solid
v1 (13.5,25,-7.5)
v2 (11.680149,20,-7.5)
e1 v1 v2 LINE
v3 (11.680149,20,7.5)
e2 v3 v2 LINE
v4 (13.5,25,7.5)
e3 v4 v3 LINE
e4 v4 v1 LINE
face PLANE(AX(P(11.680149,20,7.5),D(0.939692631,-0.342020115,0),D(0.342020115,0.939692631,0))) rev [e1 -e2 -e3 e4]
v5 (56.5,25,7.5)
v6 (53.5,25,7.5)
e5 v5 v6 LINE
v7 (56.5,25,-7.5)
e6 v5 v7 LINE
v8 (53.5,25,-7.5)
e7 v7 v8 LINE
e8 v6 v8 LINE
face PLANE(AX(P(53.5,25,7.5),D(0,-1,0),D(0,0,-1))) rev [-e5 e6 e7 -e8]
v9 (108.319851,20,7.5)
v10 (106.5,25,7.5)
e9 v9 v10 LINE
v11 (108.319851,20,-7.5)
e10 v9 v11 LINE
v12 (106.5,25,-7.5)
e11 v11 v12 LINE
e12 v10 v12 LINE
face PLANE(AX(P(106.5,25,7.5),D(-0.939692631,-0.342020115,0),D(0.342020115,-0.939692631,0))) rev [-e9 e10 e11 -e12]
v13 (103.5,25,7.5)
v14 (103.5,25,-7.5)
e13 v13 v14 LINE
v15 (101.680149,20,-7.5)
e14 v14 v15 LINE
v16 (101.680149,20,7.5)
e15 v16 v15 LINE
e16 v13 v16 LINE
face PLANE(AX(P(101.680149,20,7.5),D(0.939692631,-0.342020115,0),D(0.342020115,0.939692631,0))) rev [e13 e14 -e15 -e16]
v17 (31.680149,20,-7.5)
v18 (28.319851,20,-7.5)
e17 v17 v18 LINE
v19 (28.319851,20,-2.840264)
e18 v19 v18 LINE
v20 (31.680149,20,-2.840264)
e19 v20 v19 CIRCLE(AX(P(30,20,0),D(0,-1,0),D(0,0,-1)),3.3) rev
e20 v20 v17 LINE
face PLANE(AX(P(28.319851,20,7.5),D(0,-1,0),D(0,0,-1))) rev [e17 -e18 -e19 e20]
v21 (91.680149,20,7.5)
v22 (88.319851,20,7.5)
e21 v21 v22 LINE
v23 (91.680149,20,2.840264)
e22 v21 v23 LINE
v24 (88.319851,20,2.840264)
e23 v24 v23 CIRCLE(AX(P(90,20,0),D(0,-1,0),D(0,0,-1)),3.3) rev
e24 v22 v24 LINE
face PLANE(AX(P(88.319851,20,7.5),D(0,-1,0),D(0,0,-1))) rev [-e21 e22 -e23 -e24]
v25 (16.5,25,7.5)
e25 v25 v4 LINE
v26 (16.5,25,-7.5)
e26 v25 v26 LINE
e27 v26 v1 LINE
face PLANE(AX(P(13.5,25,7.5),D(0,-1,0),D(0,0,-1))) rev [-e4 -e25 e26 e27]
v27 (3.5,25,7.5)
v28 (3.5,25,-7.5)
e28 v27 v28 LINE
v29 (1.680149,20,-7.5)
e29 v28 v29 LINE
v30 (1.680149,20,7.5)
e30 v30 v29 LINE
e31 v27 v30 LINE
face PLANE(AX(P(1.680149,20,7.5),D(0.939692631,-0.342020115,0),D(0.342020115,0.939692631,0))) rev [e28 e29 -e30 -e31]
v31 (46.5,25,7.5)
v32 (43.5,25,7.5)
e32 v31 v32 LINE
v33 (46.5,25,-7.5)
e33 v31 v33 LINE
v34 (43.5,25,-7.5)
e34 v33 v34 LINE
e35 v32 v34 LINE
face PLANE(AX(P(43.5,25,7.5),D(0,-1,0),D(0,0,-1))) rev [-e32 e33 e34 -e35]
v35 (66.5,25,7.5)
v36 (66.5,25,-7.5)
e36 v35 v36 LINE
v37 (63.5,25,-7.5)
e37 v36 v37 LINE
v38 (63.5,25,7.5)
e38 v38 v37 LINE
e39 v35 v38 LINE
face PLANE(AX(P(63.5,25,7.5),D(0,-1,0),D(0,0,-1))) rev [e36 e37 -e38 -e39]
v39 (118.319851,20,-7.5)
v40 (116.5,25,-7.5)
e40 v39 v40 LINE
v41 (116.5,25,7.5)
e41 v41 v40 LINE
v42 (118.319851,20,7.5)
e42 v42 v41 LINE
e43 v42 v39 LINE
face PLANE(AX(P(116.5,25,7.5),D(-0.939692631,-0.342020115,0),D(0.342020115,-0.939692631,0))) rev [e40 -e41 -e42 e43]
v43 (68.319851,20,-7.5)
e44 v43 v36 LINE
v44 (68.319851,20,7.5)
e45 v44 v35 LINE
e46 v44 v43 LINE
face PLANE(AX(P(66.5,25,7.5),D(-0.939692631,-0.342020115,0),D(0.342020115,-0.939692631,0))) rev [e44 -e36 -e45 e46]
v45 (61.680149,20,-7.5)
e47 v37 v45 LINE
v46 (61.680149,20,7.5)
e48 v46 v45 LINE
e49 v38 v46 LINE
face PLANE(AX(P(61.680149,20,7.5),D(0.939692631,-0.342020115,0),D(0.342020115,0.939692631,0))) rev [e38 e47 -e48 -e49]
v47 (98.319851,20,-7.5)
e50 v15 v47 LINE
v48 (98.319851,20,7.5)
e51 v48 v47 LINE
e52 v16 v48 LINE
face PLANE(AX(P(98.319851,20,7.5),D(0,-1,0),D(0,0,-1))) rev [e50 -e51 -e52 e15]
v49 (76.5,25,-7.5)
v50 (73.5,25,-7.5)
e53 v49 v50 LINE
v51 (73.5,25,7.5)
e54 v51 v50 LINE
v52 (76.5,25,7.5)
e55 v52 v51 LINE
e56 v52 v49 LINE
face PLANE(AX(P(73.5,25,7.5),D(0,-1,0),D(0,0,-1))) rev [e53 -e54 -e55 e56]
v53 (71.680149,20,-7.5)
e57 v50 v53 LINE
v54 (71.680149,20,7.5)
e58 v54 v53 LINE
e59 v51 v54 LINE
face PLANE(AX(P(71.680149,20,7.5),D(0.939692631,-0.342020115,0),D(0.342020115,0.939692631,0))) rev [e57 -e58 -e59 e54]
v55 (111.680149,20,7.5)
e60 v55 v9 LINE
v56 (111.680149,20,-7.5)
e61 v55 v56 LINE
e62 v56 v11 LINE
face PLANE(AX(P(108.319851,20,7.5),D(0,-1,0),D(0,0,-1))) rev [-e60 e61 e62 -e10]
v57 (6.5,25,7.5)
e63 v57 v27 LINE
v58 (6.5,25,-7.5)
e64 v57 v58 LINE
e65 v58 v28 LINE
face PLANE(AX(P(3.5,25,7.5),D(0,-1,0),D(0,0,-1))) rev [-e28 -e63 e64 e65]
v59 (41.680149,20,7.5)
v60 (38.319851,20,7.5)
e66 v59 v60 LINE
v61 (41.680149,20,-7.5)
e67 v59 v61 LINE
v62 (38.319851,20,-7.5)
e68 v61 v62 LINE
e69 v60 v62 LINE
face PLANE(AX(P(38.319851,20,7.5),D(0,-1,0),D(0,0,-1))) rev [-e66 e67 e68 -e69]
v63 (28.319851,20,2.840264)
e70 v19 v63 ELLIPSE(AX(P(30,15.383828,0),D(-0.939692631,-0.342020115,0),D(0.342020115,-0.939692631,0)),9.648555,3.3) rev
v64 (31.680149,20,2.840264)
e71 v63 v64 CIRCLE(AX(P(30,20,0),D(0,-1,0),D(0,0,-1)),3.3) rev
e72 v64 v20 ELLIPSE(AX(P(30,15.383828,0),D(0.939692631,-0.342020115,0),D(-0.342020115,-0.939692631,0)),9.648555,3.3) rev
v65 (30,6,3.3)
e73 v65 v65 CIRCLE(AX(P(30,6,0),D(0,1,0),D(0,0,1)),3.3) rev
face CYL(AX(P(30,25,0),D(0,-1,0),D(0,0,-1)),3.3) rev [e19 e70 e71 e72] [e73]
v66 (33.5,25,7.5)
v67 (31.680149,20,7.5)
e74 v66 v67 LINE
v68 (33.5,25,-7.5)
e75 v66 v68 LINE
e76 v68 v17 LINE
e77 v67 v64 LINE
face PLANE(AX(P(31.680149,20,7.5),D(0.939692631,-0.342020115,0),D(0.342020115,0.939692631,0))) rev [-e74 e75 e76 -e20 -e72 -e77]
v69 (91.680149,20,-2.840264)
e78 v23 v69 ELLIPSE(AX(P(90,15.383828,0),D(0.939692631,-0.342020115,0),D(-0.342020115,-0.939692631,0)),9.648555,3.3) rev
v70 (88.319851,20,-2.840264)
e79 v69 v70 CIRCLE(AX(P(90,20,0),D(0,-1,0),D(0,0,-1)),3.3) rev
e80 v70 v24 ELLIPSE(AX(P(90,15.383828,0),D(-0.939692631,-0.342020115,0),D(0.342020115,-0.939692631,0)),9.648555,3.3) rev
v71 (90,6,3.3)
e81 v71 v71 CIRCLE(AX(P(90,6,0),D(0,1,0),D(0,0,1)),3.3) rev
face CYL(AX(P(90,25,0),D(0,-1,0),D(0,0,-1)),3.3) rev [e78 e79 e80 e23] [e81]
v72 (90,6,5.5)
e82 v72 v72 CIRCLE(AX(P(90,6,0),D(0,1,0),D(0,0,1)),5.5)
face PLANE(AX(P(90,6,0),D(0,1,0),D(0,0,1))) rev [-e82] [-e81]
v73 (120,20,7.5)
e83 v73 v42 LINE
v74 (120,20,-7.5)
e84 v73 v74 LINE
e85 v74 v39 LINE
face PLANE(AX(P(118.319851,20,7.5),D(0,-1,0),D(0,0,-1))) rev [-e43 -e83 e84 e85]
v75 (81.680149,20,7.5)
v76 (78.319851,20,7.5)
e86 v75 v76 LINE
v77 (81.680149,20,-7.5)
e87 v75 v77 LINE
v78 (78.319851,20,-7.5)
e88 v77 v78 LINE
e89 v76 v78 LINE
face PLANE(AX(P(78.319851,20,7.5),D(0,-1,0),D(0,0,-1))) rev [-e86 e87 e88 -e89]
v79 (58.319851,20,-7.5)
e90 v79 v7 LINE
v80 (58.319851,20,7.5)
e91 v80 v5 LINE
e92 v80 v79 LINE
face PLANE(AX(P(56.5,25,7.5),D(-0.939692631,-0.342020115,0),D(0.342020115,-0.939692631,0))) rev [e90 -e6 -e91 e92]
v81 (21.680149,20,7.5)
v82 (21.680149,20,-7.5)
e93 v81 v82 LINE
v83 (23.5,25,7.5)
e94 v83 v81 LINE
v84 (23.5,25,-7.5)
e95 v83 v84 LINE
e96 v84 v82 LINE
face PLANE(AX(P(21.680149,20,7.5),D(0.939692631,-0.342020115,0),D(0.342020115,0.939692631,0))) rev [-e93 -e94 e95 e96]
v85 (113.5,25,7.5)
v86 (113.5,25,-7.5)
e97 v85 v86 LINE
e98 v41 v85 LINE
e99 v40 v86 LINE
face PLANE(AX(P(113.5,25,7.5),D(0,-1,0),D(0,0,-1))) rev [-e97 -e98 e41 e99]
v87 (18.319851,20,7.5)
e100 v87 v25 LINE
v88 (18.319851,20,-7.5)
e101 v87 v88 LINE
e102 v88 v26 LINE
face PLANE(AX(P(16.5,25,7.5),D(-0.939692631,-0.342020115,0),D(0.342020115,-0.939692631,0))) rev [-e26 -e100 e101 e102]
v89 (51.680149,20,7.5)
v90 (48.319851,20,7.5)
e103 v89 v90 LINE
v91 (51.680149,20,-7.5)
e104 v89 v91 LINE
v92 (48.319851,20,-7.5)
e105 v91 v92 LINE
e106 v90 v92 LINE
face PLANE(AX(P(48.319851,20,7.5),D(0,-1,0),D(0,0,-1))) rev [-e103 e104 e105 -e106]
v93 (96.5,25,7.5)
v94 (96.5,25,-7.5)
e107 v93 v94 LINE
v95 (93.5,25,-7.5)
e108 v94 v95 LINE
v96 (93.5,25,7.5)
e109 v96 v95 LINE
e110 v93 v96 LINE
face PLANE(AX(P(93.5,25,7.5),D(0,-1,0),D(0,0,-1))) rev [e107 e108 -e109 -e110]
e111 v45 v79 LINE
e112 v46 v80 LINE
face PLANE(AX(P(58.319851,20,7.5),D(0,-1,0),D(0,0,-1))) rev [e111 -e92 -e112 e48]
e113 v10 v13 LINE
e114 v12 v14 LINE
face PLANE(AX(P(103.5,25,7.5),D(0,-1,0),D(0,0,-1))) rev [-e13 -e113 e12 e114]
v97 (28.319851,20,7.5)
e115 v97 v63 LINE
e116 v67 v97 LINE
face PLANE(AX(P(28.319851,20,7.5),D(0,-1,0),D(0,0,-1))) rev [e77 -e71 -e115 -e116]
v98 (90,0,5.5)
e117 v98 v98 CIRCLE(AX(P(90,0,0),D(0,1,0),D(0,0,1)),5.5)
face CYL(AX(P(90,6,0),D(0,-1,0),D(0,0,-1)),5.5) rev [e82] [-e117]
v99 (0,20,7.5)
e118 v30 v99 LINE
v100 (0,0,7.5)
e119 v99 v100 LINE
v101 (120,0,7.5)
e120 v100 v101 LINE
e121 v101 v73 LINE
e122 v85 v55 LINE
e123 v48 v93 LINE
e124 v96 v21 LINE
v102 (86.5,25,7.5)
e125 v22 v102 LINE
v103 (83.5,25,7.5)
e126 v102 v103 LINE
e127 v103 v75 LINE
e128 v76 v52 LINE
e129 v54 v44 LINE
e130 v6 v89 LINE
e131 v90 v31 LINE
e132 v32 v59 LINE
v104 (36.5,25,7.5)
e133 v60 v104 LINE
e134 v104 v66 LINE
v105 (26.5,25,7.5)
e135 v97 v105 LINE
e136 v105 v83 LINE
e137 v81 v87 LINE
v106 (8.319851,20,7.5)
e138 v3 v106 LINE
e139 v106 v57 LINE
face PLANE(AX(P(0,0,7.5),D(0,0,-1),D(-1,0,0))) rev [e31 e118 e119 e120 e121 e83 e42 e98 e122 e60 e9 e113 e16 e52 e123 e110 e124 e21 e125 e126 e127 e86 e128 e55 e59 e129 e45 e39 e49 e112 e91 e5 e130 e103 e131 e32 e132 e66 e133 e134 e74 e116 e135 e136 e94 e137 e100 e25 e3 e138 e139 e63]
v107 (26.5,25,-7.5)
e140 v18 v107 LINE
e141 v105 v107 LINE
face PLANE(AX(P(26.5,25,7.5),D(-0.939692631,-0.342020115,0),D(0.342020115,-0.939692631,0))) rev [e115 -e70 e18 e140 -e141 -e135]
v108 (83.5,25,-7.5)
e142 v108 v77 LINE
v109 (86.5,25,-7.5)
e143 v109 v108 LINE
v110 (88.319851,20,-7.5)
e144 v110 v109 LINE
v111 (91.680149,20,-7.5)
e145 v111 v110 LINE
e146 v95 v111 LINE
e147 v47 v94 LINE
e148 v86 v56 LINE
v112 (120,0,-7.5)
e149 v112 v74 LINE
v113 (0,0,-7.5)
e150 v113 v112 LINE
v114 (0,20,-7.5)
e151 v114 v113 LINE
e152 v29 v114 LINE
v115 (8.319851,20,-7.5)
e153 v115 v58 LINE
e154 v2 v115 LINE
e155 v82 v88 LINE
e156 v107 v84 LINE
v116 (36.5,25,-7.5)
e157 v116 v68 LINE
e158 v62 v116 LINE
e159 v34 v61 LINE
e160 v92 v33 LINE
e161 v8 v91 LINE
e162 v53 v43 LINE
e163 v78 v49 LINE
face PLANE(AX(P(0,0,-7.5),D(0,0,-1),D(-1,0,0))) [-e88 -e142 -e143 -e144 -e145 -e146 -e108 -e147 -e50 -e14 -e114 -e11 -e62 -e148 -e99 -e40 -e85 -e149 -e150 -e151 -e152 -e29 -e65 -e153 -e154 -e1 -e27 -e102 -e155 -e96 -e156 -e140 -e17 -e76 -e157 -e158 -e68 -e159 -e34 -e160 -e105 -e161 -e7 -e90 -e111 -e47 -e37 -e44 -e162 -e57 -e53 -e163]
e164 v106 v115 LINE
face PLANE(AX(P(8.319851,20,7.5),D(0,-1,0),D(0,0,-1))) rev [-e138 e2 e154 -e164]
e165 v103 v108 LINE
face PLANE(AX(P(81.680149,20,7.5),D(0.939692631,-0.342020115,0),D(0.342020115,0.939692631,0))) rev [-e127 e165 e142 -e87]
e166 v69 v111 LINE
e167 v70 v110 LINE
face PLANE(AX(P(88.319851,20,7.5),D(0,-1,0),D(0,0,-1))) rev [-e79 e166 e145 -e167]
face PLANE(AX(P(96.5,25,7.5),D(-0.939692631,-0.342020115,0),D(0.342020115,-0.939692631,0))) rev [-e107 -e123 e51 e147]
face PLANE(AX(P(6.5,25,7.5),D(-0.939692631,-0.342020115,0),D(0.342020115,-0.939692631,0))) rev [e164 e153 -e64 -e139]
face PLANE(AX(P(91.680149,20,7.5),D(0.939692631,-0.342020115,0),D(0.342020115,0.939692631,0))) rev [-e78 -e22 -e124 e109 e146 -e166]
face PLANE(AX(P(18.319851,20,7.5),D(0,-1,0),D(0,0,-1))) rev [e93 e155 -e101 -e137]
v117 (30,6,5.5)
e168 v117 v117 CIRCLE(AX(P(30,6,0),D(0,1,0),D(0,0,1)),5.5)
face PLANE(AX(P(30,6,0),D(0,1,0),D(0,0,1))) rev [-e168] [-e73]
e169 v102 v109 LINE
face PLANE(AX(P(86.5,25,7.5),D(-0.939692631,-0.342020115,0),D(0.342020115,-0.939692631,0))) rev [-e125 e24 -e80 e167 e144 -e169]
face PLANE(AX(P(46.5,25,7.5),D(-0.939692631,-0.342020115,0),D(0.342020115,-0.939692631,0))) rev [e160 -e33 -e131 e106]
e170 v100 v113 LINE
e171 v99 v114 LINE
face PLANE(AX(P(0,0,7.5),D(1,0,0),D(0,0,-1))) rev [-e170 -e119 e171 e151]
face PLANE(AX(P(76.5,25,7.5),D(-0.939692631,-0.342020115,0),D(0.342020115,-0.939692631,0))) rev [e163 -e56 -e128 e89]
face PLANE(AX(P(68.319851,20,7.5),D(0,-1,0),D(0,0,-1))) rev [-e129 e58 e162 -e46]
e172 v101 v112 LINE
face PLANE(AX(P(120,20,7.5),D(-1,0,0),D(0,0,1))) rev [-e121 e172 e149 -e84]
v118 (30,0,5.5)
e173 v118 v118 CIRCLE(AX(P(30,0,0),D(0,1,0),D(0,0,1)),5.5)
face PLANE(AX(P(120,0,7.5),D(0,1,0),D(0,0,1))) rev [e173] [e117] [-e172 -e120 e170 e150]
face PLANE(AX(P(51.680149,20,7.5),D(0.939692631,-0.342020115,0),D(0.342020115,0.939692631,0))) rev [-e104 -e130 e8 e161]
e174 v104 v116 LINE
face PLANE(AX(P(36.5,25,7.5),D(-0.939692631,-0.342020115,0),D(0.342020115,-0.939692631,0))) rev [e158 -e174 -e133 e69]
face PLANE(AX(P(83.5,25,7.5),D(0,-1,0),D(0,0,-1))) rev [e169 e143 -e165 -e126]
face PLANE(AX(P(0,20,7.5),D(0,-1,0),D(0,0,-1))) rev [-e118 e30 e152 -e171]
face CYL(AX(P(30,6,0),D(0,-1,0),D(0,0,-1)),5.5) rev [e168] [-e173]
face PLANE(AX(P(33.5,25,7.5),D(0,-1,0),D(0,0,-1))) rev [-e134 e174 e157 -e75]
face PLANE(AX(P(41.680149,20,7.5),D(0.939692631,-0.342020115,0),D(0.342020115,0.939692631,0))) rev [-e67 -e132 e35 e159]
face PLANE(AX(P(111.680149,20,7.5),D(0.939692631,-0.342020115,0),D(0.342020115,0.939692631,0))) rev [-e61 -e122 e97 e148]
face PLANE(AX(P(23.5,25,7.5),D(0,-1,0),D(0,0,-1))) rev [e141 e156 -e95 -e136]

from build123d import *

# Parameters (mm, degrees)
EXTRUDE_START       = -7.5
EXTRUDE_1_DEPTH     = 15
SKETCH_2_R          = 5.5
CUT_EXTRUDE_1_DEPTH = 6
SKETCH_3_R          = 3.3
CUT_EXTRUDE_2_DEPTH = 123.805740908


# Read off the part's stored shape, not the designer's step: 凸台-拉伸1
with BuildPart() as part:
    # 凸台-拉伸1 outline → 凸台-拉伸1 (new body)
    with BuildSketch(Plane.XY.offset(EXTRUDE_START)):
        Polygon((0, 0), (120, 0), (120, 20), (118.319851, 20), (116.5, 25), (113.5, 25), (111.680149, 20), (108.319851, 20), (106.5, 25), (103.5, 25), (101.680149, 20), (98.319851, 20), (96.5, 25), (93.5, 25), (91.680149, 20), (88.319851, 20), (86.5, 25), (83.5, 25), (81.680149, 20), (78.319851, 20), (76.5, 25), (73.5, 25), (71.680149, 20), (68.319851, 20), (66.5, 25), (63.5, 25), (61.680149, 20), (58.319851, 20), (56.5, 25), (53.5, 25), (51.680149, 20), (48.319851, 20), (46.5, 25), (43.5, 25), (41.680149, 20), (38.319851, 20), (36.5, 25), (33.5, 25), (31.680149, 20), (28.319851, 20), (26.5, 25), (23.5, 25), (21.680149, 20), (18.319851, 20), (16.5, 25), (13.5, 25), (11.680149, 20), (8.319851, 20), (6.5, 25), (3.5, 25), (1.680149, 20), (0, 20), align=None)
    extrude(amount=EXTRUDE_1_DEPTH)

    # 草图2 → 切除-拉伸1 (cut)
    with BuildSketch(Plane(origin=(0, 0, 0), x_dir=(1, 0, 0), z_dir=(0, 1, 0))):
        with Locations(Location((30, 0, 0), (0, 0, 270))):
            Circle(SKETCH_2_R)
        with Locations(Location((90, 0, 0), (0, 0, 270))):
            Circle(SKETCH_2_R)
    extrude(amount=CUT_EXTRUDE_1_DEPTH, mode=Mode.SUBTRACT)

    # 草图3 → 切除-拉伸2 (cut, through all)
    with BuildSketch(Plane(origin=(0, 0, 0), x_dir=(1, 0, 0), z_dir=(0, 1, 0))):
        with Locations(Location((30, 0, 0), (0, 0, 120.606300293))):
            Circle(SKETCH_3_R)
        with Locations(Location((90, 0, 0), (0, 0, 120.606300293))):
            Circle(SKETCH_3_R)
    extrude(amount=CUT_EXTRUDE_2_DEPTH, mode=Mode.SUBTRACT)


solid = part.part
